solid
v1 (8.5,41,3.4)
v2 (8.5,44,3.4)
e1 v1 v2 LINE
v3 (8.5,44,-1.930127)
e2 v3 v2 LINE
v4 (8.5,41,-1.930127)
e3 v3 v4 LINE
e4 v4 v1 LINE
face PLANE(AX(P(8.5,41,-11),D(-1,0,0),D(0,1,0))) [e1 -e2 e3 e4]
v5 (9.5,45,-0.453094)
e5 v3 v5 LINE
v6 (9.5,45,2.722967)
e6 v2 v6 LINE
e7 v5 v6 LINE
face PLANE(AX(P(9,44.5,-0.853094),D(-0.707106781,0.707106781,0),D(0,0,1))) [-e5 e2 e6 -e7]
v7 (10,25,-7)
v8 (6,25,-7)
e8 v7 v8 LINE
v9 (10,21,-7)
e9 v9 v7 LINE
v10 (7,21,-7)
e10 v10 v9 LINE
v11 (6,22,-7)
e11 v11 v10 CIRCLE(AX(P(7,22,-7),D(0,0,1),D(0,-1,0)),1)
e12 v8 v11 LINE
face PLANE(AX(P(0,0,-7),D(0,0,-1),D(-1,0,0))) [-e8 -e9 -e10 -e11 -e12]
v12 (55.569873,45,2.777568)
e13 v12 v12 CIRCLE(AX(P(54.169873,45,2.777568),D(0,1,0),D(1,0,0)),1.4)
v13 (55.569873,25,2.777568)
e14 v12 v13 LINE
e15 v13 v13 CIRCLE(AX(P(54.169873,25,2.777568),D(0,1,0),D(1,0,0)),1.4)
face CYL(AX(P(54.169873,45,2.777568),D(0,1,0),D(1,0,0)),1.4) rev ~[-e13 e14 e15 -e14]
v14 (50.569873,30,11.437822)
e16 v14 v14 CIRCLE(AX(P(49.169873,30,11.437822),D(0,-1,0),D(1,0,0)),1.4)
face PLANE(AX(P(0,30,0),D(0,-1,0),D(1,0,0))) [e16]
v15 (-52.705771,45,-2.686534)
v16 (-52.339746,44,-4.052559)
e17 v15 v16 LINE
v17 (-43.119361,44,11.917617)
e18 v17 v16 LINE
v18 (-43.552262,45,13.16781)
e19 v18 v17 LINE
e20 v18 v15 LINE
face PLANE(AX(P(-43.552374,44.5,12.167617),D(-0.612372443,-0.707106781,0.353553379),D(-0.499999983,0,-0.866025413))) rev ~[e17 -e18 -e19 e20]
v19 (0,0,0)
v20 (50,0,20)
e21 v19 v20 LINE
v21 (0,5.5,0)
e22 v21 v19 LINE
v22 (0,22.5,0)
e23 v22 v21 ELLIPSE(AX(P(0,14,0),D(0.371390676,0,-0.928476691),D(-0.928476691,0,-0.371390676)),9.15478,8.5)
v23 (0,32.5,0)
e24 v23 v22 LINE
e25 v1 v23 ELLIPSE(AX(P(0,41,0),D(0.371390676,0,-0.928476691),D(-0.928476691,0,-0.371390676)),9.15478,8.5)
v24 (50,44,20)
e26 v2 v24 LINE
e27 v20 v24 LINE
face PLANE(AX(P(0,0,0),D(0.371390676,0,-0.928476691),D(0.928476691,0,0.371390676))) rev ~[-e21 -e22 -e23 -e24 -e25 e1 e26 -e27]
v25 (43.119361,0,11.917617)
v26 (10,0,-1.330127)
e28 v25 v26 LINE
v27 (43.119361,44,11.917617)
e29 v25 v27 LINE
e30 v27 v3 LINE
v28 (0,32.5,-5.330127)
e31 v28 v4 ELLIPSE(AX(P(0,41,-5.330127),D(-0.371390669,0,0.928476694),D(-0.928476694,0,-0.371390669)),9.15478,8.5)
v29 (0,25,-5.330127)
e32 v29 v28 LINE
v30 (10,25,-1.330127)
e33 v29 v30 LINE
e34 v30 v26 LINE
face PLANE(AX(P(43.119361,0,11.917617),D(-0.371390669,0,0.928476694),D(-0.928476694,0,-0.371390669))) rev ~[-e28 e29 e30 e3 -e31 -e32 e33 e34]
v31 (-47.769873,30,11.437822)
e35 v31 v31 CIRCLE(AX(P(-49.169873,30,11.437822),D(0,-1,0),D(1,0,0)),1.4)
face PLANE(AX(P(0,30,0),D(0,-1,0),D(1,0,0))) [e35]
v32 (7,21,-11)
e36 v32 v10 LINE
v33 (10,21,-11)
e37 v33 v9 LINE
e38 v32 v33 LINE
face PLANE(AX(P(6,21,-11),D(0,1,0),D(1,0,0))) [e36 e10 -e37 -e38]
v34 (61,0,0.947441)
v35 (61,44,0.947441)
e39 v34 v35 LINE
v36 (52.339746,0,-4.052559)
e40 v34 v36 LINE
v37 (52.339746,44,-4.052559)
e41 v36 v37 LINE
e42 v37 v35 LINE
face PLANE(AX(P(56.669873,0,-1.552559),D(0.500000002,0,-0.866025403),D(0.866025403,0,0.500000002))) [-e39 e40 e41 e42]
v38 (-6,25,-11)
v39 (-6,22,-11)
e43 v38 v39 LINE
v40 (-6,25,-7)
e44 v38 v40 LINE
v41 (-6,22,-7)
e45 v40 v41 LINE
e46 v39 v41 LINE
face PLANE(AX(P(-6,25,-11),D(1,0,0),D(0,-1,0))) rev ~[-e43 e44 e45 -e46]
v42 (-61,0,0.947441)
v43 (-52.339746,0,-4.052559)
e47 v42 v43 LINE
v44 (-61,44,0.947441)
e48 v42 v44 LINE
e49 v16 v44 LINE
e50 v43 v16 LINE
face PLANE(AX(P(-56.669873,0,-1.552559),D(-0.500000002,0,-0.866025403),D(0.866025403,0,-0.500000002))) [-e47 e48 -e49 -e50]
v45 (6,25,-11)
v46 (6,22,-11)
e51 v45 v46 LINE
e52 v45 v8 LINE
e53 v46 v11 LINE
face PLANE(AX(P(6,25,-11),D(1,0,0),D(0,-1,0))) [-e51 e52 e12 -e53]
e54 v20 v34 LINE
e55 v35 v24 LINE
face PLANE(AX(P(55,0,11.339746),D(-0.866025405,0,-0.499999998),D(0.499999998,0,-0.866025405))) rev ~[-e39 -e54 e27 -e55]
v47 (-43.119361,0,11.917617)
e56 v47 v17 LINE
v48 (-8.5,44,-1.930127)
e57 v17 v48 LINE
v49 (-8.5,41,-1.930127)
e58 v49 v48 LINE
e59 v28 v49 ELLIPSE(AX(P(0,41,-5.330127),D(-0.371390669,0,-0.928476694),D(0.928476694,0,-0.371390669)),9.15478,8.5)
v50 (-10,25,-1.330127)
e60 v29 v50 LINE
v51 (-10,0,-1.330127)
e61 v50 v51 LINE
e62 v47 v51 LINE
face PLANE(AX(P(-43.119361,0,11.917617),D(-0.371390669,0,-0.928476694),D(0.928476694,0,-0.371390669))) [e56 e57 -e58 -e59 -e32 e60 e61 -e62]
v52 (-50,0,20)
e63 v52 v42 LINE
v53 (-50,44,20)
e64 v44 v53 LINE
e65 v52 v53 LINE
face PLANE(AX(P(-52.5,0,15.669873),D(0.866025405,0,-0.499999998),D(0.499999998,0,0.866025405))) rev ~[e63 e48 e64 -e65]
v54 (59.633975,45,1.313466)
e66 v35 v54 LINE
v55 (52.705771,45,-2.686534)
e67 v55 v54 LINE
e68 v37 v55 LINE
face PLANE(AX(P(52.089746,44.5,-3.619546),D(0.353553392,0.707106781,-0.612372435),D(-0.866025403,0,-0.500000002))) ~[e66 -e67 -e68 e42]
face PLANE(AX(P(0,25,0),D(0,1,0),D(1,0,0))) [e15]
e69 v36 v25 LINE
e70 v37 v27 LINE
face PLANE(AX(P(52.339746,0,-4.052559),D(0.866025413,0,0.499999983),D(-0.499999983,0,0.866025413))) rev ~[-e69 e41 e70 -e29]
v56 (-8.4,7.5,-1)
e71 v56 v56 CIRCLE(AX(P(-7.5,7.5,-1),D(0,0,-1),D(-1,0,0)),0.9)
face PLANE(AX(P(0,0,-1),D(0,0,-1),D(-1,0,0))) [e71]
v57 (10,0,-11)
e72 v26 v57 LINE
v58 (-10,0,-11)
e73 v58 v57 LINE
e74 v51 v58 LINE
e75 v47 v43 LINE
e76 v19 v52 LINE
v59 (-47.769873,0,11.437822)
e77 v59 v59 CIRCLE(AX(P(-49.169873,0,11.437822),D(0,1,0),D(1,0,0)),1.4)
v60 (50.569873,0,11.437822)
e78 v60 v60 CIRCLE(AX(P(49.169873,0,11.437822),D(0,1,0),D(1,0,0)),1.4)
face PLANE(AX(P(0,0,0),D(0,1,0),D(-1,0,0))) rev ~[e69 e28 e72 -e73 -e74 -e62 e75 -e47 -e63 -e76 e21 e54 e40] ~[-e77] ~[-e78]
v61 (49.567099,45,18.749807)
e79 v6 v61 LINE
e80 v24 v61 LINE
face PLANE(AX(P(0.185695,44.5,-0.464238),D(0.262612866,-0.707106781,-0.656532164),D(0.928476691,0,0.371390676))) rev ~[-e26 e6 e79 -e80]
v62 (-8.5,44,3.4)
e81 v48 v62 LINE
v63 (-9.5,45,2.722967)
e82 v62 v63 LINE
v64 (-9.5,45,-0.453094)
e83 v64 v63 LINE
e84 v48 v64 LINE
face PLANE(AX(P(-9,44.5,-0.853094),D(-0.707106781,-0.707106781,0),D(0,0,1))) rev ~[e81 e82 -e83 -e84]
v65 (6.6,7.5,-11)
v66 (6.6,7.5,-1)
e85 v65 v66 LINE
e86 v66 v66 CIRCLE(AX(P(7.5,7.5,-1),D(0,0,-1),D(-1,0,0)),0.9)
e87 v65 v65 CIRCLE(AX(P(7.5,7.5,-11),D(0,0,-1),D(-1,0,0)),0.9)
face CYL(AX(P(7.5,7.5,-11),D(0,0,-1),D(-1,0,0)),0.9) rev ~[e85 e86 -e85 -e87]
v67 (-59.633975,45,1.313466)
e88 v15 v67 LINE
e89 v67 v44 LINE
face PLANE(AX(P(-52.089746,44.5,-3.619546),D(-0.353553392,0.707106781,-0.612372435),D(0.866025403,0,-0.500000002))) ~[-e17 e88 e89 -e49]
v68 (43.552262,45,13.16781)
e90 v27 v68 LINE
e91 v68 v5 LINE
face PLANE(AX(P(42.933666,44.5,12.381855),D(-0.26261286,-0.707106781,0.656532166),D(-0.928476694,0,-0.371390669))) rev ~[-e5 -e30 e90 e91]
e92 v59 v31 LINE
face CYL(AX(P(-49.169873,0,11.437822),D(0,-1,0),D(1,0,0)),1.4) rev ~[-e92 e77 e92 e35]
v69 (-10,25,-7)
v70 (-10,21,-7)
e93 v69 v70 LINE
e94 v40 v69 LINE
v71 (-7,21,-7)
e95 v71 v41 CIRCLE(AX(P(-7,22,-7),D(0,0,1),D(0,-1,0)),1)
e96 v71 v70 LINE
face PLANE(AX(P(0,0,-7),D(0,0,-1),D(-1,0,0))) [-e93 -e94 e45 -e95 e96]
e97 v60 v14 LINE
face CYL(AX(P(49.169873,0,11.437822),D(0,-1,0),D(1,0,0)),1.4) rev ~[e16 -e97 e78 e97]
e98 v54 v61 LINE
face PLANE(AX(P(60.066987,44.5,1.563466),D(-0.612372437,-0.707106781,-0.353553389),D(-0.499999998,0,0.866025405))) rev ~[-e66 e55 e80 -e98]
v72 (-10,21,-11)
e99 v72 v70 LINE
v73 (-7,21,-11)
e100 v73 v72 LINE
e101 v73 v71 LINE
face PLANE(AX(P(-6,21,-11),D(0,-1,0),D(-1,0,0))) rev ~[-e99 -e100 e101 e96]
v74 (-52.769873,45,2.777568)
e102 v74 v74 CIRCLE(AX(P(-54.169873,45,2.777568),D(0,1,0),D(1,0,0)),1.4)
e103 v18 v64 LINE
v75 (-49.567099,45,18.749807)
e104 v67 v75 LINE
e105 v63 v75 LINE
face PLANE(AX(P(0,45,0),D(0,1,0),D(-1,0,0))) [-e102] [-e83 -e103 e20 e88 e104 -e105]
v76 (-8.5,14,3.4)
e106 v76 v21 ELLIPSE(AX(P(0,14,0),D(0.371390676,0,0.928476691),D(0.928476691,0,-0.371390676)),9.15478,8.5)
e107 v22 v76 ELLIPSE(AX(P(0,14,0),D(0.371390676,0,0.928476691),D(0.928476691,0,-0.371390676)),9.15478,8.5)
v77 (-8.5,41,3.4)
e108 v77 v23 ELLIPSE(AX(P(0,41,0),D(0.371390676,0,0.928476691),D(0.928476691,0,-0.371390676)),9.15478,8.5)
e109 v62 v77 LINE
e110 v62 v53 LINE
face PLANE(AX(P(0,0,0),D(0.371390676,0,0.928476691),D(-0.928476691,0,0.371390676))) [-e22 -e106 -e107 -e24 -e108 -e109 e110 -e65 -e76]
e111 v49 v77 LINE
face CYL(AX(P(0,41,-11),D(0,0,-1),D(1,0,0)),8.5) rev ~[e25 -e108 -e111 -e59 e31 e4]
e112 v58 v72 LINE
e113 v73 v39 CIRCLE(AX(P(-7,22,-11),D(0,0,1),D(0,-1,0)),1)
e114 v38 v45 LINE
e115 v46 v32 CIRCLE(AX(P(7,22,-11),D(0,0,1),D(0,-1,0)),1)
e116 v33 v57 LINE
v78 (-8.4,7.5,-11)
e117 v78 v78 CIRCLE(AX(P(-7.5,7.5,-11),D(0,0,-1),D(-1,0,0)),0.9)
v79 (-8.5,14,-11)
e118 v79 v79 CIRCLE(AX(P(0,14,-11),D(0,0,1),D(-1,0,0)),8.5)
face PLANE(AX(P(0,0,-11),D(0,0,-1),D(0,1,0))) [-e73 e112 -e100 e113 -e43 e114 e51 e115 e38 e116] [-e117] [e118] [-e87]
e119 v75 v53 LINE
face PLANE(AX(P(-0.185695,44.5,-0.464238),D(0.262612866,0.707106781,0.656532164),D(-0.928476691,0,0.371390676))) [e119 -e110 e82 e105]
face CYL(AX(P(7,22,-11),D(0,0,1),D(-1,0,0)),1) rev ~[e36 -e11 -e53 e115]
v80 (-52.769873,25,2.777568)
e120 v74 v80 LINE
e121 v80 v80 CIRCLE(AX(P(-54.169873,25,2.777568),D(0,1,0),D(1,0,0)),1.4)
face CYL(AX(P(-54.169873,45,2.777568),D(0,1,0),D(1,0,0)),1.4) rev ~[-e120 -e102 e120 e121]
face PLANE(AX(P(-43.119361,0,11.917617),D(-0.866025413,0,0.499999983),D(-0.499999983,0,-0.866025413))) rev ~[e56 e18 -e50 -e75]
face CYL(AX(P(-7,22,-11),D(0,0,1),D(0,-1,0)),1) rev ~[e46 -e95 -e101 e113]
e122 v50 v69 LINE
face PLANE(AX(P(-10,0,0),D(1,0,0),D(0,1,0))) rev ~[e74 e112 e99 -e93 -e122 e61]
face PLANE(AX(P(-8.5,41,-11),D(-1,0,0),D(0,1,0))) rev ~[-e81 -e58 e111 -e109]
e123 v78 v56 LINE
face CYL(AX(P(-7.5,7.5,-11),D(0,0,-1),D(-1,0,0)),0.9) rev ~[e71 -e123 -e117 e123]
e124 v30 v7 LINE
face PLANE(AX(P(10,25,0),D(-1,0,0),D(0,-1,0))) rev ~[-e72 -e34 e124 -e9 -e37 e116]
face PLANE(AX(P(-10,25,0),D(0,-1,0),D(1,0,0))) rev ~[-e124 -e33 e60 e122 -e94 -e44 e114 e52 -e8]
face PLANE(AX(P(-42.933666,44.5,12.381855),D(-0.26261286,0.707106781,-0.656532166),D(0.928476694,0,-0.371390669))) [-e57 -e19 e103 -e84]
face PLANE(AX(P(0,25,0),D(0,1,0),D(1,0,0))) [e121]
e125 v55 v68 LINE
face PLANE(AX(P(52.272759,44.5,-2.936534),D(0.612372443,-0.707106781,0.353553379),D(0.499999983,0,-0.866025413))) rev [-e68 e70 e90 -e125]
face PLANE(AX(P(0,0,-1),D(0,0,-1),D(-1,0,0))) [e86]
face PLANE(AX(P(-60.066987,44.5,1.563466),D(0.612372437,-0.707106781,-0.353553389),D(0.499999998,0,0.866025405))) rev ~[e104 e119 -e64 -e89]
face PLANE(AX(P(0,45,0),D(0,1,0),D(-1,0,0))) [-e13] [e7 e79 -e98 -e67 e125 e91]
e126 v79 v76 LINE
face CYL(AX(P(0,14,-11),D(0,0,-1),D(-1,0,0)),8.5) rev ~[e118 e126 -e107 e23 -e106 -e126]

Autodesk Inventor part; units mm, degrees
ref_plane "XZ Plane" through (0, 0, 0) normal (0, 1, 0) x (-1, 0, 0)
ref_plane "XY Plane" through (0, 0, 0) normal (0, 0, 1) x (1, 0, 0)
sketch "Sketch1" plane through (0, 0, 0) normal (0, 1, 0) x (-1, 0, 0)
  line L0 (-56.669873, -1.552559) -> (-61, 0.947441)
  line L1 (56.669873, -1.552559) -> (61, 0.947441)
  line L2 (61, 0.947441) -> (50, 20)
  line L3 (-50, 20) -> (-61, 0.947441)
  line L4 (0, 0) -> (-50, 20)
  line L5 (0, 0) -> (50, 20)
  line L6 (-50, 20) -> (-55, 11.339746)
  line L7 (50, 20) -> (55, 11.339746)
  line L8 (-56.669873, -1.552559) -> (-52.339746, -4.052559)
  line L9 (56.669873, -1.552559) -> (52.339746, -4.052559)
  line L10 (50, 20) -> (52.5, 15.669873)
  line L11 (-50, 20) -> (-52.5, 15.669873)
  line L12 (-43.119361, 11.917617) -> (0, -5.330127)
  line L13 (43.119361, 11.917617) -> (0, -5.330127)
  line L14 (-52.339746, -4.052559) -> (-43.119361, 11.917617)
  line L15 (43.119361, 11.917617) -> (52.339746, -4.052559)
  dimension "d1" = 5
  dimension "d2" = 5
  dimension "d3" = 5
  dimension "d4" = 5
extrude "Extrusion1" add sketch "Sketch1" along normal blind 45
sketch "Sketch2" plane through (0, 0, 0) normal (0, -1, 0) x (1, 0, 0)
  line L0 (61, 0.947441) -> (52.339746, -4.052559)
  line L1 (50, 20) -> (61, 0.947441)
  line L2 (0, 0) -> (50, 20)
  line L3 (-50, 20) -> (0, 0)
  line L4 (-61, 0.947441) -> (-50, 20)
  line L5 (-52.339746, -4.052559) -> (-61, 0.947441)
  line L6 (-43.119361, 11.917617) -> (-52.339746, -4.052559)
  line L7 (0, -5.330127) -> (-43.119361, 11.917617)
  line L8 (43.119361, 11.917617) -> (0, -5.330127)
  line L9 (52.339746, -4.052559) -> (43.119361, 11.917617)
  line L10 (-56.669873, -1.552559) -> (-49.169873, 11.437822)
  line L11 (56.669873, -1.552559) -> (49.169873, 11.437822)
  circle A0 centre (49.169873, 11.437822) radius 1.4
  circle A1 centre (-49.169873, 11.437822) radius 1.4
  dimension "d8" = 15
  dimension "d9" = 15
  dimension "d10" = 2.8
  dimension "d11" = 2.8
extrude "Extrusion2" cut sketch "Sketch2" against normal blind 30 contours A0 | A1
sketch "Sketch3" plane through (0, 45, 0) normal (0, 1, 0) x (1, 0, 0)
  circle A0 centre (-54.169873, -2.777568) radius 1.4
  circle A1 centre (54.169873, -2.777568) radius 1.4
  line L0 (61, -0.947441) -> (52.339746, 4.052559)
  line L1 (52.339746, 4.052559) -> (43.119361, -11.917617)
  line L2 (43.119361, -11.917617) -> (0, 5.330127)
  line L3 (0, 5.330127) -> (-43.119361, -11.917617)
  line L4 (-43.119361, -11.917617) -> (-52.339746, 4.052559)
  line L5 (-52.339746, 4.052559) -> (-61, -0.947441)
  line L6 (-61, -0.947441) -> (-50, -20)
  line L7 (-50, -20) -> (0, 0)
  line L8 (0, 0) -> (50, -20)
  line L9 (50, -20) -> (61, -0.947441)
  dimension "d30" = 2.8
  dimension "d31" = 2.8
extrude "Extrusion3" cut sketch "Sketch3" against normal blind 20 contours A0 | A1
chamfer "Chamfer1" distance 1 angle 45 2 edges at (-56.6699, 45, -1.5526) (56.6699, 45, -1.5526)
chamfer "Chamfer2" distance 1 angle 45 8 edges at (55.25, 45, 10.9067) (47.4796, 45, 4.3655) (21.5597, 45, 3.2937) (-21.5597, 45, 3.2937) (-47.4796, 45, 4.3655) (-55.25, 45, 10.9067) (-25, 45, 10) (25, 45, 10)
ref_plane "Work Plane1" through (0, 0, 0) normal (0, 0, -1) x (0, 1, 0)
sketch "Sketch4" plane through (0, 0, 0) normal (0, 0, -1) x (0, 1, 0)
  line L0 (0, 0) -> (0, -10)
  line L1 (0, 0) -> (0, -43.119361)
  line L2 (0, -10) -> (25, -10)
  line L3 (25, -10) -> (25, 10)
  line L4 (25, 10) -> (0, 10)
  line L5 (0, 10) -> (0, 0)
  dimension "d33" = 10
  dimension "d34" = 25
  dimension "d35" = 20
extrude "Extrusion4" add sketch "Sketch4" along normal blind 11
sketch "Sketch5" plane through (0, 0, -11) normal (0, 0, -1) x (-1, 0, 0)
  circle A0 centre (0, 14) radius 8.5
  circle A1 centre (-7.5, 7.5) radius 0.9
  circle A2 centre (7.5, 7.5) radius 0.9
  line L0 (0, 14) -> (0, 41)
  line L1 (0, 0) -> (0, 44)
  line L2 (-8.5, 41) -> (-8.5, 45)
  line L3 (0, 45) -> (-43.552262, 45)
  line L4 (8.5, 41) -> (8.5, 45)
  line L5 (0, 45) -> (49.567099, 45)
  line L6 (8.5, 45) -> (-8.5, 45)
  arc A3 (-8.5, 41) -> (8.5, 41) centre (0, 41) ccw
  dimension "d38" = 17
  dimension "d39" = 1.8
  dimension "d40" = 1.8
  dimension "d41" = 27
extrude "Extrusion5" cut sketch "Sketch5" against normal through all contours A0 L1 L0 | L0 L1 A0 | L2 L3 L5 L4 A3
chamfer "Chamfer3" distance 1 angle 45 2 edges at (8.5, 45, 0.7349) (-8.5, 45, 0.7349)
sketch "Sketch6" plane through (0, 0, -11) normal (0, 0, -1) x (-1, 0, 0)
  circle A0 centre (-7.5, 7.5) radius 0.9
  circle A1 centre (7.5, 7.5) radius 0.9
  point P0 (0, 0)
  point P1 (0, 0)
  dimension "d49" = 1.8
  dimension "d50" = 1.8
extrude "Extrusion6" cut sketch "Sketch6" against normal blind 10
sketch "Sketch7" plane through (0, 0, -11) normal (0, 0, -1) x (-1, 0, 0)
  line L0 (-10, 25) -> (10, 25)
  line L1 (-10, 25) -> (-6, 25)
  line L2 (-6, 25) -> (-6, 21)
  line L3 (-6, 21) -> (-10, 21)
  line L4 (10, 25) -> (6, 25)
  line L5 (-10, 25) -> (10, 25)
  line L6 (6, 25) -> (6, 21)
  line L7 (6, 21) -> (10, 21)
  line L8 (10, 25) -> (10, 21)
  line L9 (-10, 25) -> (-6, 25)
  line L10 (-6, 25) -> (-6, 21)
  line L11 (-6, 21) -> (-10, 21)
  line L12 (-10, 21) -> (-10, 25)
  line L13 (6, 25) -> (10, 25)
  line L14 (10, 25) -> (10, 21)
  line L15 (10, 21) -> (6, 21)
  line L16 (6, 21) -> (6, 25)
  dimension "d54" = 4
  dimension "d55" = 4
  dimension "d56" = 4
extrude "Extrusion7" cut sketch "Sketch7" against normal blind 4
fillet "Fillet1" radius 1 2 edges at (6, 21, -9) (-6, 21, -9)
properties part number "Front Support" material "ABS Plastic"
